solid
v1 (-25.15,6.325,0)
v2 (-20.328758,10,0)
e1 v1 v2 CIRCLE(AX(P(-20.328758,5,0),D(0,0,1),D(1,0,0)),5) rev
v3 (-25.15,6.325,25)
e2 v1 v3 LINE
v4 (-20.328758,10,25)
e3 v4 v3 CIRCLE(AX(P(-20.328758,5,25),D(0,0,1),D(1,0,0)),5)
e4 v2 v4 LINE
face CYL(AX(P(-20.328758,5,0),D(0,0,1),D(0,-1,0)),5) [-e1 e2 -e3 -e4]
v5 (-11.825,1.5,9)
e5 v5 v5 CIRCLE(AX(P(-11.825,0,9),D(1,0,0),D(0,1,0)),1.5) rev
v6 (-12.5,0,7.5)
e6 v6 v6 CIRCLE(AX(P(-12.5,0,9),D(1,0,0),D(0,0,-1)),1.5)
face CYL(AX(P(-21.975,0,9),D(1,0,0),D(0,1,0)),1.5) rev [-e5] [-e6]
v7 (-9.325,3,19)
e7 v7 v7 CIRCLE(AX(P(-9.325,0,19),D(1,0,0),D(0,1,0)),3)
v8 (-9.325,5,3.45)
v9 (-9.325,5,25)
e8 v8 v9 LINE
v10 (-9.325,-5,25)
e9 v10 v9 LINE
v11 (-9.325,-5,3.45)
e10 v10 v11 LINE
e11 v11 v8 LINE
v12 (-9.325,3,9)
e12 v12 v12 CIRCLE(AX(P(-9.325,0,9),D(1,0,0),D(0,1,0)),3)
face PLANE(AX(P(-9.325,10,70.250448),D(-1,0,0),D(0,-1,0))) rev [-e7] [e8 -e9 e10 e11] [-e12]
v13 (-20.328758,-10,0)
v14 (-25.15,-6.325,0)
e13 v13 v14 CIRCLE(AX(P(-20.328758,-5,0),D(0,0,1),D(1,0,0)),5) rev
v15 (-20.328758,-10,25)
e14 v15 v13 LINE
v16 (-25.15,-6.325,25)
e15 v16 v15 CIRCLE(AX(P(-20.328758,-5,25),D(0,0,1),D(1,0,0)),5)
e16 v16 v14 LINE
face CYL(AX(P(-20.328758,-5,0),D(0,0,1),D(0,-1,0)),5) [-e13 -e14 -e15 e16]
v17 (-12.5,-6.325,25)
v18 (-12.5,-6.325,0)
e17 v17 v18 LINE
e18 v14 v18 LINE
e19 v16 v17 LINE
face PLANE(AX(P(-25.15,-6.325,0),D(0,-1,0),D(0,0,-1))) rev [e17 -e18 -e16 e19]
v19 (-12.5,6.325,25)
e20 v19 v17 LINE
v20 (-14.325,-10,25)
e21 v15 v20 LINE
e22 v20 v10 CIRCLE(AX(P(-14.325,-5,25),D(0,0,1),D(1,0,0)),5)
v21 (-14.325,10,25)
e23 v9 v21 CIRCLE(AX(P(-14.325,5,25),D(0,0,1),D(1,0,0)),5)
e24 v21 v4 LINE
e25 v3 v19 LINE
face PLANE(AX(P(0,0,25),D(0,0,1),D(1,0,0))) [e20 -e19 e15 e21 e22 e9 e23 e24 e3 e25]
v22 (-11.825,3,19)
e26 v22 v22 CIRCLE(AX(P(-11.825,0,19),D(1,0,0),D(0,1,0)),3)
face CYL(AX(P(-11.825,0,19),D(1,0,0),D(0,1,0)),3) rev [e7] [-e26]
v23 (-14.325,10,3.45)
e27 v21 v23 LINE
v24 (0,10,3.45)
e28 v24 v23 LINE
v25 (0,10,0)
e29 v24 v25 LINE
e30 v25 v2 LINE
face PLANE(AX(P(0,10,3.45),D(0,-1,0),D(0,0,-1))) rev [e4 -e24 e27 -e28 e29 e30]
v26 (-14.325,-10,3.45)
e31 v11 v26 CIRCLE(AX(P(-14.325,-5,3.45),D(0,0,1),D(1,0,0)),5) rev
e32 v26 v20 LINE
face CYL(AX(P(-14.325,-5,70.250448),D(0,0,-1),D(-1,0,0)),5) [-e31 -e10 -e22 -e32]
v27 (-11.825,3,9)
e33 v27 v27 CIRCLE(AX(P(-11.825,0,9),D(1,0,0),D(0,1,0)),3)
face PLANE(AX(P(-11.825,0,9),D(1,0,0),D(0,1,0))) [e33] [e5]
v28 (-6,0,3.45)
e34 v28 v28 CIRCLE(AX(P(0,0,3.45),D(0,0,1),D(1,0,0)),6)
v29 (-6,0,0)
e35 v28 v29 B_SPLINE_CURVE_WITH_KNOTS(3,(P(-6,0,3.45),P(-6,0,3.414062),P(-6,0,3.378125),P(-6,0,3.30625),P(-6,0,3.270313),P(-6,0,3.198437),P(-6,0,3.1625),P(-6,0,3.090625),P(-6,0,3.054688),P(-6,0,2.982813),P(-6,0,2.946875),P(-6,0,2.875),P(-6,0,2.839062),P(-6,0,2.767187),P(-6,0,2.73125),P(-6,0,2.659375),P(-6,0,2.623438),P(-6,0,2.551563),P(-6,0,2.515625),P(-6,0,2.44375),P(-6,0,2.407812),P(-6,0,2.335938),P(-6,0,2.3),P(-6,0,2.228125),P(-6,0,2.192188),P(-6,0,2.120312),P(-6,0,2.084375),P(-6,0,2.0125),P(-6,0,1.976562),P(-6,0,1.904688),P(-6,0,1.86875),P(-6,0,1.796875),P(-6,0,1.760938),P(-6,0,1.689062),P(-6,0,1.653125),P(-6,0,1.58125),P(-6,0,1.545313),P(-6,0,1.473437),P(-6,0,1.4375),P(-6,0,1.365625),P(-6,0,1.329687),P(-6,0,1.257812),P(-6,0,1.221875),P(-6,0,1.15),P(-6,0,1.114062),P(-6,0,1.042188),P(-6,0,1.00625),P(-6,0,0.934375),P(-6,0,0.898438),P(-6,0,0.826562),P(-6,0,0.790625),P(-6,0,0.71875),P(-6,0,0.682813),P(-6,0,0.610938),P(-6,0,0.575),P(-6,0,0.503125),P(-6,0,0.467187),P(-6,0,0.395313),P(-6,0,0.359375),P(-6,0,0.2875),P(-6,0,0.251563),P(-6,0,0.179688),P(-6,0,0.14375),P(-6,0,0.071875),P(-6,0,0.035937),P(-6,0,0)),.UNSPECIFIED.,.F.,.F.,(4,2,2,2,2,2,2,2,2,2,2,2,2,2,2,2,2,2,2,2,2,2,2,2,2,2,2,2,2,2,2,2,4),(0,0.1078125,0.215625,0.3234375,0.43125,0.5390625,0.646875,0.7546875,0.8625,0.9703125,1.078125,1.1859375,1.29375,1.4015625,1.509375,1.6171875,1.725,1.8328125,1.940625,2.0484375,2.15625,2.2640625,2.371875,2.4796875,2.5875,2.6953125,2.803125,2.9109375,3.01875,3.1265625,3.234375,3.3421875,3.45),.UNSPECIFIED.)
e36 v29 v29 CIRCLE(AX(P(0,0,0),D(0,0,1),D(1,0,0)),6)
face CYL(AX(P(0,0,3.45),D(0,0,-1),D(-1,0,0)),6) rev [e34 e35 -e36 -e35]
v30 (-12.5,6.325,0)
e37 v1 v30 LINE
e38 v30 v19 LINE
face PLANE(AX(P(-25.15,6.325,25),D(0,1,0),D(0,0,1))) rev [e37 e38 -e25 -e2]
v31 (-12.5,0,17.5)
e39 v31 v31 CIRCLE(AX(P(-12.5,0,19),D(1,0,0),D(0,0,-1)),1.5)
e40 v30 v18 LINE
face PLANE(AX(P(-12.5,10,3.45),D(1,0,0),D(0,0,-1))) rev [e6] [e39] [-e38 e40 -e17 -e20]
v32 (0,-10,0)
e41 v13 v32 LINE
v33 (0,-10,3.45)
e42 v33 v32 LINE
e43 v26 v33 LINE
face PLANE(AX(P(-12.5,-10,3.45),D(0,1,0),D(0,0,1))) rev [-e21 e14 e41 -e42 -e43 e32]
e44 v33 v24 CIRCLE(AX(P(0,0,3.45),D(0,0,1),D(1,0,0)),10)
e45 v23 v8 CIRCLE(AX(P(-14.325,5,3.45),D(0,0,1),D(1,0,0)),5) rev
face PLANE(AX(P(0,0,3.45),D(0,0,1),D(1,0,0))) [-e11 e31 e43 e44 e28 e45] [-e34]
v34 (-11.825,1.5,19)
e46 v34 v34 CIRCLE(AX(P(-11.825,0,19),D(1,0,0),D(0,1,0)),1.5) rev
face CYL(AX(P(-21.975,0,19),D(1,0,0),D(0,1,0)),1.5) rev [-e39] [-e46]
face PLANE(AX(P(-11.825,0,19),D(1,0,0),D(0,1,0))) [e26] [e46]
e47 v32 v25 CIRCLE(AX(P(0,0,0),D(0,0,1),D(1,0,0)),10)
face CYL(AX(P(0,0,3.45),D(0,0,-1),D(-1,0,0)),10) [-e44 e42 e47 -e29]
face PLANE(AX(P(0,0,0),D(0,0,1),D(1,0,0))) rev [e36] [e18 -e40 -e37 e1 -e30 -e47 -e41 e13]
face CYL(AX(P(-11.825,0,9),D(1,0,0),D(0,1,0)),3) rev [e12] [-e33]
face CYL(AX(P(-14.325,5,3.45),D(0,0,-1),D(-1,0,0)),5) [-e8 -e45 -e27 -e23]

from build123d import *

# Parameters (mm, degrees)
SKETCH1_R           = 6
BOSS_EXTRUDE1_DEPTH = 3.45
SKETCH2_W           = 3.175
SKETCH2_H           = 20
BOSS_EXTRUDE2_DEPTH = 21.55
SKETCH3_W           = 25
SKETCH3_H           = 3.675
BOSS_EXTRUDE3_DEPTH = 12.65
FILLET1_R           = 5
SKETCH5_R           = 1.5
CUT_EXTRUDE1_DEPTH  = 12.65
SKETCH6_R           = 3
CUT_EXTRUDE2_DEPTH  = 2.5
FILLET2_R           = 5


with BuildPart() as part:
    # Sketch1 → Boss-Extrude1 (new body)
    with BuildSketch(Plane.XY):
        with BuildLine():
            Line((0, 10), (-12.5, 10))
            Line((-12.5, 10), (-12.5, -10))
            Line((-12.5, -10), (0, -10))
            ThreePointArc((0, -10), (10, 0), (0, 10))
        make_face()
        with Locations(Location((0, 0, 0), (0, 0, 180))):
            Circle(SKETCH1_R, mode=Mode.SUBTRACT)
    extrude(amount=BOSS_EXTRUDE1_DEPTH)

    # Sketch2 → Boss-Extrude2 (add)
    with BuildSketch(Plane.XY.offset(3.45)):
        with Locations((-10.9125, 0)):
            Rectangle(SKETCH2_W, SKETCH2_H)
    extrude(amount=BOSS_EXTRUDE2_DEPTH)

    # Sketch3 → Boss-Extrude3 (add)
    with BuildSketch(Plane.ZY.offset(12.5)):
        with Locations((12.5, 8.1625)):
            Rectangle(SKETCH3_W, SKETCH3_H)
        with Locations((12.5, -8.1625)):
            Rectangle(SKETCH3_W, SKETCH3_H)
    extrude(amount=BOSS_EXTRUDE3_DEPTH)

    # Fillet1
    fillet1_edges = [part.edges().sort_by_distance(p)[0] for p in [
        (-9.325, 10, 14.225),
        (-9.325, -10, 14.225),
    ]]
    fillet(fillet1_edges, radius=FILLET1_R)

    # Sketch5 → Cut-Extrude1 (cut)
    with BuildSketch(Plane(origin=(-9.325, 0, 0), x_dir=(0, 0, -1), z_dir=(1, 0, 0))):
        with Locations(Location((-19, 0, 0), (0, 0, 90))):
            Circle(SKETCH5_R)
        with Locations(Location((-9, 0, 0), (0, 0, 90))):
            Circle(SKETCH5_R)
    extrude(amount=-CUT_EXTRUDE1_DEPTH, mode=Mode.SUBTRACT)

    # Sketch6 → Cut-Extrude2 (cut)
    with BuildSketch(Plane(origin=(-9.325, 0, 0), x_dir=(0, 0, -1), z_dir=(1, 0, 0))):
        with Locations(Location((-19, 0, 0), (0, 0, 90))):
            Circle(SKETCH6_R)
        with Locations(Location((-9, 0, 0), (0, 0, 90))):
            Circle(SKETCH6_R)
    extrude(amount=-CUT_EXTRUDE2_DEPTH, mode=Mode.SUBTRACT)

    # Fillet2
    # the kernel refuses this fillet: 5 mm, written as the material it takes off along each edge
    with BuildSketch(Plane(origin=(-25.15, 10, 37.05310515), x_dir=(1, 0, 0), z_dir=(0, 0, -1))) as fillet2_piece_1:
        with BuildLine():
            CenterArc((4.82124206, 5), FILLET2_R, 195.366952798, 74.633047202)
            Line((0, 3.675), (-0.096424841, 3.6485))
            ThreePointArc((-0.096424841, 3.6485), (-0.1, 1.8375), (-0.1, 0))
            Line((-0.1, 0), (0, -0.1))
            Line((0, -0.1), (4.82124206, -0.1))
            Line((4.82124206, -0.1), (4.82124206, 0))
        make_face()
    extrude(amount=49.106210299, mode=Mode.SUBTRACT)
    with BuildSketch(Plane(origin=(-25.15, -10, 37.05310515), x_dir=(1, 0, 0), z_dir=(0, 0, -1))) as fillet2_piece_2:
        with BuildLine():
            CenterArc((4.82124206, -5), FILLET2_R, 90, 74.633047202)
            Line((0, -3.675), (-0.096424841, -3.6485))
            ThreePointArc((-0.096424841, -3.6485), (-0.1, -1.8375), (-0.1, 0))
            Line((-0.1, 0), (0, 0.1))
            Line((0, 0.1), (4.82124206, 0.1))
            Line((4.82124206, 0.1), (4.82124206, 0))
        make_face()
    extrude(amount=49.106210299, mode=Mode.SUBTRACT)


solid = part.part
